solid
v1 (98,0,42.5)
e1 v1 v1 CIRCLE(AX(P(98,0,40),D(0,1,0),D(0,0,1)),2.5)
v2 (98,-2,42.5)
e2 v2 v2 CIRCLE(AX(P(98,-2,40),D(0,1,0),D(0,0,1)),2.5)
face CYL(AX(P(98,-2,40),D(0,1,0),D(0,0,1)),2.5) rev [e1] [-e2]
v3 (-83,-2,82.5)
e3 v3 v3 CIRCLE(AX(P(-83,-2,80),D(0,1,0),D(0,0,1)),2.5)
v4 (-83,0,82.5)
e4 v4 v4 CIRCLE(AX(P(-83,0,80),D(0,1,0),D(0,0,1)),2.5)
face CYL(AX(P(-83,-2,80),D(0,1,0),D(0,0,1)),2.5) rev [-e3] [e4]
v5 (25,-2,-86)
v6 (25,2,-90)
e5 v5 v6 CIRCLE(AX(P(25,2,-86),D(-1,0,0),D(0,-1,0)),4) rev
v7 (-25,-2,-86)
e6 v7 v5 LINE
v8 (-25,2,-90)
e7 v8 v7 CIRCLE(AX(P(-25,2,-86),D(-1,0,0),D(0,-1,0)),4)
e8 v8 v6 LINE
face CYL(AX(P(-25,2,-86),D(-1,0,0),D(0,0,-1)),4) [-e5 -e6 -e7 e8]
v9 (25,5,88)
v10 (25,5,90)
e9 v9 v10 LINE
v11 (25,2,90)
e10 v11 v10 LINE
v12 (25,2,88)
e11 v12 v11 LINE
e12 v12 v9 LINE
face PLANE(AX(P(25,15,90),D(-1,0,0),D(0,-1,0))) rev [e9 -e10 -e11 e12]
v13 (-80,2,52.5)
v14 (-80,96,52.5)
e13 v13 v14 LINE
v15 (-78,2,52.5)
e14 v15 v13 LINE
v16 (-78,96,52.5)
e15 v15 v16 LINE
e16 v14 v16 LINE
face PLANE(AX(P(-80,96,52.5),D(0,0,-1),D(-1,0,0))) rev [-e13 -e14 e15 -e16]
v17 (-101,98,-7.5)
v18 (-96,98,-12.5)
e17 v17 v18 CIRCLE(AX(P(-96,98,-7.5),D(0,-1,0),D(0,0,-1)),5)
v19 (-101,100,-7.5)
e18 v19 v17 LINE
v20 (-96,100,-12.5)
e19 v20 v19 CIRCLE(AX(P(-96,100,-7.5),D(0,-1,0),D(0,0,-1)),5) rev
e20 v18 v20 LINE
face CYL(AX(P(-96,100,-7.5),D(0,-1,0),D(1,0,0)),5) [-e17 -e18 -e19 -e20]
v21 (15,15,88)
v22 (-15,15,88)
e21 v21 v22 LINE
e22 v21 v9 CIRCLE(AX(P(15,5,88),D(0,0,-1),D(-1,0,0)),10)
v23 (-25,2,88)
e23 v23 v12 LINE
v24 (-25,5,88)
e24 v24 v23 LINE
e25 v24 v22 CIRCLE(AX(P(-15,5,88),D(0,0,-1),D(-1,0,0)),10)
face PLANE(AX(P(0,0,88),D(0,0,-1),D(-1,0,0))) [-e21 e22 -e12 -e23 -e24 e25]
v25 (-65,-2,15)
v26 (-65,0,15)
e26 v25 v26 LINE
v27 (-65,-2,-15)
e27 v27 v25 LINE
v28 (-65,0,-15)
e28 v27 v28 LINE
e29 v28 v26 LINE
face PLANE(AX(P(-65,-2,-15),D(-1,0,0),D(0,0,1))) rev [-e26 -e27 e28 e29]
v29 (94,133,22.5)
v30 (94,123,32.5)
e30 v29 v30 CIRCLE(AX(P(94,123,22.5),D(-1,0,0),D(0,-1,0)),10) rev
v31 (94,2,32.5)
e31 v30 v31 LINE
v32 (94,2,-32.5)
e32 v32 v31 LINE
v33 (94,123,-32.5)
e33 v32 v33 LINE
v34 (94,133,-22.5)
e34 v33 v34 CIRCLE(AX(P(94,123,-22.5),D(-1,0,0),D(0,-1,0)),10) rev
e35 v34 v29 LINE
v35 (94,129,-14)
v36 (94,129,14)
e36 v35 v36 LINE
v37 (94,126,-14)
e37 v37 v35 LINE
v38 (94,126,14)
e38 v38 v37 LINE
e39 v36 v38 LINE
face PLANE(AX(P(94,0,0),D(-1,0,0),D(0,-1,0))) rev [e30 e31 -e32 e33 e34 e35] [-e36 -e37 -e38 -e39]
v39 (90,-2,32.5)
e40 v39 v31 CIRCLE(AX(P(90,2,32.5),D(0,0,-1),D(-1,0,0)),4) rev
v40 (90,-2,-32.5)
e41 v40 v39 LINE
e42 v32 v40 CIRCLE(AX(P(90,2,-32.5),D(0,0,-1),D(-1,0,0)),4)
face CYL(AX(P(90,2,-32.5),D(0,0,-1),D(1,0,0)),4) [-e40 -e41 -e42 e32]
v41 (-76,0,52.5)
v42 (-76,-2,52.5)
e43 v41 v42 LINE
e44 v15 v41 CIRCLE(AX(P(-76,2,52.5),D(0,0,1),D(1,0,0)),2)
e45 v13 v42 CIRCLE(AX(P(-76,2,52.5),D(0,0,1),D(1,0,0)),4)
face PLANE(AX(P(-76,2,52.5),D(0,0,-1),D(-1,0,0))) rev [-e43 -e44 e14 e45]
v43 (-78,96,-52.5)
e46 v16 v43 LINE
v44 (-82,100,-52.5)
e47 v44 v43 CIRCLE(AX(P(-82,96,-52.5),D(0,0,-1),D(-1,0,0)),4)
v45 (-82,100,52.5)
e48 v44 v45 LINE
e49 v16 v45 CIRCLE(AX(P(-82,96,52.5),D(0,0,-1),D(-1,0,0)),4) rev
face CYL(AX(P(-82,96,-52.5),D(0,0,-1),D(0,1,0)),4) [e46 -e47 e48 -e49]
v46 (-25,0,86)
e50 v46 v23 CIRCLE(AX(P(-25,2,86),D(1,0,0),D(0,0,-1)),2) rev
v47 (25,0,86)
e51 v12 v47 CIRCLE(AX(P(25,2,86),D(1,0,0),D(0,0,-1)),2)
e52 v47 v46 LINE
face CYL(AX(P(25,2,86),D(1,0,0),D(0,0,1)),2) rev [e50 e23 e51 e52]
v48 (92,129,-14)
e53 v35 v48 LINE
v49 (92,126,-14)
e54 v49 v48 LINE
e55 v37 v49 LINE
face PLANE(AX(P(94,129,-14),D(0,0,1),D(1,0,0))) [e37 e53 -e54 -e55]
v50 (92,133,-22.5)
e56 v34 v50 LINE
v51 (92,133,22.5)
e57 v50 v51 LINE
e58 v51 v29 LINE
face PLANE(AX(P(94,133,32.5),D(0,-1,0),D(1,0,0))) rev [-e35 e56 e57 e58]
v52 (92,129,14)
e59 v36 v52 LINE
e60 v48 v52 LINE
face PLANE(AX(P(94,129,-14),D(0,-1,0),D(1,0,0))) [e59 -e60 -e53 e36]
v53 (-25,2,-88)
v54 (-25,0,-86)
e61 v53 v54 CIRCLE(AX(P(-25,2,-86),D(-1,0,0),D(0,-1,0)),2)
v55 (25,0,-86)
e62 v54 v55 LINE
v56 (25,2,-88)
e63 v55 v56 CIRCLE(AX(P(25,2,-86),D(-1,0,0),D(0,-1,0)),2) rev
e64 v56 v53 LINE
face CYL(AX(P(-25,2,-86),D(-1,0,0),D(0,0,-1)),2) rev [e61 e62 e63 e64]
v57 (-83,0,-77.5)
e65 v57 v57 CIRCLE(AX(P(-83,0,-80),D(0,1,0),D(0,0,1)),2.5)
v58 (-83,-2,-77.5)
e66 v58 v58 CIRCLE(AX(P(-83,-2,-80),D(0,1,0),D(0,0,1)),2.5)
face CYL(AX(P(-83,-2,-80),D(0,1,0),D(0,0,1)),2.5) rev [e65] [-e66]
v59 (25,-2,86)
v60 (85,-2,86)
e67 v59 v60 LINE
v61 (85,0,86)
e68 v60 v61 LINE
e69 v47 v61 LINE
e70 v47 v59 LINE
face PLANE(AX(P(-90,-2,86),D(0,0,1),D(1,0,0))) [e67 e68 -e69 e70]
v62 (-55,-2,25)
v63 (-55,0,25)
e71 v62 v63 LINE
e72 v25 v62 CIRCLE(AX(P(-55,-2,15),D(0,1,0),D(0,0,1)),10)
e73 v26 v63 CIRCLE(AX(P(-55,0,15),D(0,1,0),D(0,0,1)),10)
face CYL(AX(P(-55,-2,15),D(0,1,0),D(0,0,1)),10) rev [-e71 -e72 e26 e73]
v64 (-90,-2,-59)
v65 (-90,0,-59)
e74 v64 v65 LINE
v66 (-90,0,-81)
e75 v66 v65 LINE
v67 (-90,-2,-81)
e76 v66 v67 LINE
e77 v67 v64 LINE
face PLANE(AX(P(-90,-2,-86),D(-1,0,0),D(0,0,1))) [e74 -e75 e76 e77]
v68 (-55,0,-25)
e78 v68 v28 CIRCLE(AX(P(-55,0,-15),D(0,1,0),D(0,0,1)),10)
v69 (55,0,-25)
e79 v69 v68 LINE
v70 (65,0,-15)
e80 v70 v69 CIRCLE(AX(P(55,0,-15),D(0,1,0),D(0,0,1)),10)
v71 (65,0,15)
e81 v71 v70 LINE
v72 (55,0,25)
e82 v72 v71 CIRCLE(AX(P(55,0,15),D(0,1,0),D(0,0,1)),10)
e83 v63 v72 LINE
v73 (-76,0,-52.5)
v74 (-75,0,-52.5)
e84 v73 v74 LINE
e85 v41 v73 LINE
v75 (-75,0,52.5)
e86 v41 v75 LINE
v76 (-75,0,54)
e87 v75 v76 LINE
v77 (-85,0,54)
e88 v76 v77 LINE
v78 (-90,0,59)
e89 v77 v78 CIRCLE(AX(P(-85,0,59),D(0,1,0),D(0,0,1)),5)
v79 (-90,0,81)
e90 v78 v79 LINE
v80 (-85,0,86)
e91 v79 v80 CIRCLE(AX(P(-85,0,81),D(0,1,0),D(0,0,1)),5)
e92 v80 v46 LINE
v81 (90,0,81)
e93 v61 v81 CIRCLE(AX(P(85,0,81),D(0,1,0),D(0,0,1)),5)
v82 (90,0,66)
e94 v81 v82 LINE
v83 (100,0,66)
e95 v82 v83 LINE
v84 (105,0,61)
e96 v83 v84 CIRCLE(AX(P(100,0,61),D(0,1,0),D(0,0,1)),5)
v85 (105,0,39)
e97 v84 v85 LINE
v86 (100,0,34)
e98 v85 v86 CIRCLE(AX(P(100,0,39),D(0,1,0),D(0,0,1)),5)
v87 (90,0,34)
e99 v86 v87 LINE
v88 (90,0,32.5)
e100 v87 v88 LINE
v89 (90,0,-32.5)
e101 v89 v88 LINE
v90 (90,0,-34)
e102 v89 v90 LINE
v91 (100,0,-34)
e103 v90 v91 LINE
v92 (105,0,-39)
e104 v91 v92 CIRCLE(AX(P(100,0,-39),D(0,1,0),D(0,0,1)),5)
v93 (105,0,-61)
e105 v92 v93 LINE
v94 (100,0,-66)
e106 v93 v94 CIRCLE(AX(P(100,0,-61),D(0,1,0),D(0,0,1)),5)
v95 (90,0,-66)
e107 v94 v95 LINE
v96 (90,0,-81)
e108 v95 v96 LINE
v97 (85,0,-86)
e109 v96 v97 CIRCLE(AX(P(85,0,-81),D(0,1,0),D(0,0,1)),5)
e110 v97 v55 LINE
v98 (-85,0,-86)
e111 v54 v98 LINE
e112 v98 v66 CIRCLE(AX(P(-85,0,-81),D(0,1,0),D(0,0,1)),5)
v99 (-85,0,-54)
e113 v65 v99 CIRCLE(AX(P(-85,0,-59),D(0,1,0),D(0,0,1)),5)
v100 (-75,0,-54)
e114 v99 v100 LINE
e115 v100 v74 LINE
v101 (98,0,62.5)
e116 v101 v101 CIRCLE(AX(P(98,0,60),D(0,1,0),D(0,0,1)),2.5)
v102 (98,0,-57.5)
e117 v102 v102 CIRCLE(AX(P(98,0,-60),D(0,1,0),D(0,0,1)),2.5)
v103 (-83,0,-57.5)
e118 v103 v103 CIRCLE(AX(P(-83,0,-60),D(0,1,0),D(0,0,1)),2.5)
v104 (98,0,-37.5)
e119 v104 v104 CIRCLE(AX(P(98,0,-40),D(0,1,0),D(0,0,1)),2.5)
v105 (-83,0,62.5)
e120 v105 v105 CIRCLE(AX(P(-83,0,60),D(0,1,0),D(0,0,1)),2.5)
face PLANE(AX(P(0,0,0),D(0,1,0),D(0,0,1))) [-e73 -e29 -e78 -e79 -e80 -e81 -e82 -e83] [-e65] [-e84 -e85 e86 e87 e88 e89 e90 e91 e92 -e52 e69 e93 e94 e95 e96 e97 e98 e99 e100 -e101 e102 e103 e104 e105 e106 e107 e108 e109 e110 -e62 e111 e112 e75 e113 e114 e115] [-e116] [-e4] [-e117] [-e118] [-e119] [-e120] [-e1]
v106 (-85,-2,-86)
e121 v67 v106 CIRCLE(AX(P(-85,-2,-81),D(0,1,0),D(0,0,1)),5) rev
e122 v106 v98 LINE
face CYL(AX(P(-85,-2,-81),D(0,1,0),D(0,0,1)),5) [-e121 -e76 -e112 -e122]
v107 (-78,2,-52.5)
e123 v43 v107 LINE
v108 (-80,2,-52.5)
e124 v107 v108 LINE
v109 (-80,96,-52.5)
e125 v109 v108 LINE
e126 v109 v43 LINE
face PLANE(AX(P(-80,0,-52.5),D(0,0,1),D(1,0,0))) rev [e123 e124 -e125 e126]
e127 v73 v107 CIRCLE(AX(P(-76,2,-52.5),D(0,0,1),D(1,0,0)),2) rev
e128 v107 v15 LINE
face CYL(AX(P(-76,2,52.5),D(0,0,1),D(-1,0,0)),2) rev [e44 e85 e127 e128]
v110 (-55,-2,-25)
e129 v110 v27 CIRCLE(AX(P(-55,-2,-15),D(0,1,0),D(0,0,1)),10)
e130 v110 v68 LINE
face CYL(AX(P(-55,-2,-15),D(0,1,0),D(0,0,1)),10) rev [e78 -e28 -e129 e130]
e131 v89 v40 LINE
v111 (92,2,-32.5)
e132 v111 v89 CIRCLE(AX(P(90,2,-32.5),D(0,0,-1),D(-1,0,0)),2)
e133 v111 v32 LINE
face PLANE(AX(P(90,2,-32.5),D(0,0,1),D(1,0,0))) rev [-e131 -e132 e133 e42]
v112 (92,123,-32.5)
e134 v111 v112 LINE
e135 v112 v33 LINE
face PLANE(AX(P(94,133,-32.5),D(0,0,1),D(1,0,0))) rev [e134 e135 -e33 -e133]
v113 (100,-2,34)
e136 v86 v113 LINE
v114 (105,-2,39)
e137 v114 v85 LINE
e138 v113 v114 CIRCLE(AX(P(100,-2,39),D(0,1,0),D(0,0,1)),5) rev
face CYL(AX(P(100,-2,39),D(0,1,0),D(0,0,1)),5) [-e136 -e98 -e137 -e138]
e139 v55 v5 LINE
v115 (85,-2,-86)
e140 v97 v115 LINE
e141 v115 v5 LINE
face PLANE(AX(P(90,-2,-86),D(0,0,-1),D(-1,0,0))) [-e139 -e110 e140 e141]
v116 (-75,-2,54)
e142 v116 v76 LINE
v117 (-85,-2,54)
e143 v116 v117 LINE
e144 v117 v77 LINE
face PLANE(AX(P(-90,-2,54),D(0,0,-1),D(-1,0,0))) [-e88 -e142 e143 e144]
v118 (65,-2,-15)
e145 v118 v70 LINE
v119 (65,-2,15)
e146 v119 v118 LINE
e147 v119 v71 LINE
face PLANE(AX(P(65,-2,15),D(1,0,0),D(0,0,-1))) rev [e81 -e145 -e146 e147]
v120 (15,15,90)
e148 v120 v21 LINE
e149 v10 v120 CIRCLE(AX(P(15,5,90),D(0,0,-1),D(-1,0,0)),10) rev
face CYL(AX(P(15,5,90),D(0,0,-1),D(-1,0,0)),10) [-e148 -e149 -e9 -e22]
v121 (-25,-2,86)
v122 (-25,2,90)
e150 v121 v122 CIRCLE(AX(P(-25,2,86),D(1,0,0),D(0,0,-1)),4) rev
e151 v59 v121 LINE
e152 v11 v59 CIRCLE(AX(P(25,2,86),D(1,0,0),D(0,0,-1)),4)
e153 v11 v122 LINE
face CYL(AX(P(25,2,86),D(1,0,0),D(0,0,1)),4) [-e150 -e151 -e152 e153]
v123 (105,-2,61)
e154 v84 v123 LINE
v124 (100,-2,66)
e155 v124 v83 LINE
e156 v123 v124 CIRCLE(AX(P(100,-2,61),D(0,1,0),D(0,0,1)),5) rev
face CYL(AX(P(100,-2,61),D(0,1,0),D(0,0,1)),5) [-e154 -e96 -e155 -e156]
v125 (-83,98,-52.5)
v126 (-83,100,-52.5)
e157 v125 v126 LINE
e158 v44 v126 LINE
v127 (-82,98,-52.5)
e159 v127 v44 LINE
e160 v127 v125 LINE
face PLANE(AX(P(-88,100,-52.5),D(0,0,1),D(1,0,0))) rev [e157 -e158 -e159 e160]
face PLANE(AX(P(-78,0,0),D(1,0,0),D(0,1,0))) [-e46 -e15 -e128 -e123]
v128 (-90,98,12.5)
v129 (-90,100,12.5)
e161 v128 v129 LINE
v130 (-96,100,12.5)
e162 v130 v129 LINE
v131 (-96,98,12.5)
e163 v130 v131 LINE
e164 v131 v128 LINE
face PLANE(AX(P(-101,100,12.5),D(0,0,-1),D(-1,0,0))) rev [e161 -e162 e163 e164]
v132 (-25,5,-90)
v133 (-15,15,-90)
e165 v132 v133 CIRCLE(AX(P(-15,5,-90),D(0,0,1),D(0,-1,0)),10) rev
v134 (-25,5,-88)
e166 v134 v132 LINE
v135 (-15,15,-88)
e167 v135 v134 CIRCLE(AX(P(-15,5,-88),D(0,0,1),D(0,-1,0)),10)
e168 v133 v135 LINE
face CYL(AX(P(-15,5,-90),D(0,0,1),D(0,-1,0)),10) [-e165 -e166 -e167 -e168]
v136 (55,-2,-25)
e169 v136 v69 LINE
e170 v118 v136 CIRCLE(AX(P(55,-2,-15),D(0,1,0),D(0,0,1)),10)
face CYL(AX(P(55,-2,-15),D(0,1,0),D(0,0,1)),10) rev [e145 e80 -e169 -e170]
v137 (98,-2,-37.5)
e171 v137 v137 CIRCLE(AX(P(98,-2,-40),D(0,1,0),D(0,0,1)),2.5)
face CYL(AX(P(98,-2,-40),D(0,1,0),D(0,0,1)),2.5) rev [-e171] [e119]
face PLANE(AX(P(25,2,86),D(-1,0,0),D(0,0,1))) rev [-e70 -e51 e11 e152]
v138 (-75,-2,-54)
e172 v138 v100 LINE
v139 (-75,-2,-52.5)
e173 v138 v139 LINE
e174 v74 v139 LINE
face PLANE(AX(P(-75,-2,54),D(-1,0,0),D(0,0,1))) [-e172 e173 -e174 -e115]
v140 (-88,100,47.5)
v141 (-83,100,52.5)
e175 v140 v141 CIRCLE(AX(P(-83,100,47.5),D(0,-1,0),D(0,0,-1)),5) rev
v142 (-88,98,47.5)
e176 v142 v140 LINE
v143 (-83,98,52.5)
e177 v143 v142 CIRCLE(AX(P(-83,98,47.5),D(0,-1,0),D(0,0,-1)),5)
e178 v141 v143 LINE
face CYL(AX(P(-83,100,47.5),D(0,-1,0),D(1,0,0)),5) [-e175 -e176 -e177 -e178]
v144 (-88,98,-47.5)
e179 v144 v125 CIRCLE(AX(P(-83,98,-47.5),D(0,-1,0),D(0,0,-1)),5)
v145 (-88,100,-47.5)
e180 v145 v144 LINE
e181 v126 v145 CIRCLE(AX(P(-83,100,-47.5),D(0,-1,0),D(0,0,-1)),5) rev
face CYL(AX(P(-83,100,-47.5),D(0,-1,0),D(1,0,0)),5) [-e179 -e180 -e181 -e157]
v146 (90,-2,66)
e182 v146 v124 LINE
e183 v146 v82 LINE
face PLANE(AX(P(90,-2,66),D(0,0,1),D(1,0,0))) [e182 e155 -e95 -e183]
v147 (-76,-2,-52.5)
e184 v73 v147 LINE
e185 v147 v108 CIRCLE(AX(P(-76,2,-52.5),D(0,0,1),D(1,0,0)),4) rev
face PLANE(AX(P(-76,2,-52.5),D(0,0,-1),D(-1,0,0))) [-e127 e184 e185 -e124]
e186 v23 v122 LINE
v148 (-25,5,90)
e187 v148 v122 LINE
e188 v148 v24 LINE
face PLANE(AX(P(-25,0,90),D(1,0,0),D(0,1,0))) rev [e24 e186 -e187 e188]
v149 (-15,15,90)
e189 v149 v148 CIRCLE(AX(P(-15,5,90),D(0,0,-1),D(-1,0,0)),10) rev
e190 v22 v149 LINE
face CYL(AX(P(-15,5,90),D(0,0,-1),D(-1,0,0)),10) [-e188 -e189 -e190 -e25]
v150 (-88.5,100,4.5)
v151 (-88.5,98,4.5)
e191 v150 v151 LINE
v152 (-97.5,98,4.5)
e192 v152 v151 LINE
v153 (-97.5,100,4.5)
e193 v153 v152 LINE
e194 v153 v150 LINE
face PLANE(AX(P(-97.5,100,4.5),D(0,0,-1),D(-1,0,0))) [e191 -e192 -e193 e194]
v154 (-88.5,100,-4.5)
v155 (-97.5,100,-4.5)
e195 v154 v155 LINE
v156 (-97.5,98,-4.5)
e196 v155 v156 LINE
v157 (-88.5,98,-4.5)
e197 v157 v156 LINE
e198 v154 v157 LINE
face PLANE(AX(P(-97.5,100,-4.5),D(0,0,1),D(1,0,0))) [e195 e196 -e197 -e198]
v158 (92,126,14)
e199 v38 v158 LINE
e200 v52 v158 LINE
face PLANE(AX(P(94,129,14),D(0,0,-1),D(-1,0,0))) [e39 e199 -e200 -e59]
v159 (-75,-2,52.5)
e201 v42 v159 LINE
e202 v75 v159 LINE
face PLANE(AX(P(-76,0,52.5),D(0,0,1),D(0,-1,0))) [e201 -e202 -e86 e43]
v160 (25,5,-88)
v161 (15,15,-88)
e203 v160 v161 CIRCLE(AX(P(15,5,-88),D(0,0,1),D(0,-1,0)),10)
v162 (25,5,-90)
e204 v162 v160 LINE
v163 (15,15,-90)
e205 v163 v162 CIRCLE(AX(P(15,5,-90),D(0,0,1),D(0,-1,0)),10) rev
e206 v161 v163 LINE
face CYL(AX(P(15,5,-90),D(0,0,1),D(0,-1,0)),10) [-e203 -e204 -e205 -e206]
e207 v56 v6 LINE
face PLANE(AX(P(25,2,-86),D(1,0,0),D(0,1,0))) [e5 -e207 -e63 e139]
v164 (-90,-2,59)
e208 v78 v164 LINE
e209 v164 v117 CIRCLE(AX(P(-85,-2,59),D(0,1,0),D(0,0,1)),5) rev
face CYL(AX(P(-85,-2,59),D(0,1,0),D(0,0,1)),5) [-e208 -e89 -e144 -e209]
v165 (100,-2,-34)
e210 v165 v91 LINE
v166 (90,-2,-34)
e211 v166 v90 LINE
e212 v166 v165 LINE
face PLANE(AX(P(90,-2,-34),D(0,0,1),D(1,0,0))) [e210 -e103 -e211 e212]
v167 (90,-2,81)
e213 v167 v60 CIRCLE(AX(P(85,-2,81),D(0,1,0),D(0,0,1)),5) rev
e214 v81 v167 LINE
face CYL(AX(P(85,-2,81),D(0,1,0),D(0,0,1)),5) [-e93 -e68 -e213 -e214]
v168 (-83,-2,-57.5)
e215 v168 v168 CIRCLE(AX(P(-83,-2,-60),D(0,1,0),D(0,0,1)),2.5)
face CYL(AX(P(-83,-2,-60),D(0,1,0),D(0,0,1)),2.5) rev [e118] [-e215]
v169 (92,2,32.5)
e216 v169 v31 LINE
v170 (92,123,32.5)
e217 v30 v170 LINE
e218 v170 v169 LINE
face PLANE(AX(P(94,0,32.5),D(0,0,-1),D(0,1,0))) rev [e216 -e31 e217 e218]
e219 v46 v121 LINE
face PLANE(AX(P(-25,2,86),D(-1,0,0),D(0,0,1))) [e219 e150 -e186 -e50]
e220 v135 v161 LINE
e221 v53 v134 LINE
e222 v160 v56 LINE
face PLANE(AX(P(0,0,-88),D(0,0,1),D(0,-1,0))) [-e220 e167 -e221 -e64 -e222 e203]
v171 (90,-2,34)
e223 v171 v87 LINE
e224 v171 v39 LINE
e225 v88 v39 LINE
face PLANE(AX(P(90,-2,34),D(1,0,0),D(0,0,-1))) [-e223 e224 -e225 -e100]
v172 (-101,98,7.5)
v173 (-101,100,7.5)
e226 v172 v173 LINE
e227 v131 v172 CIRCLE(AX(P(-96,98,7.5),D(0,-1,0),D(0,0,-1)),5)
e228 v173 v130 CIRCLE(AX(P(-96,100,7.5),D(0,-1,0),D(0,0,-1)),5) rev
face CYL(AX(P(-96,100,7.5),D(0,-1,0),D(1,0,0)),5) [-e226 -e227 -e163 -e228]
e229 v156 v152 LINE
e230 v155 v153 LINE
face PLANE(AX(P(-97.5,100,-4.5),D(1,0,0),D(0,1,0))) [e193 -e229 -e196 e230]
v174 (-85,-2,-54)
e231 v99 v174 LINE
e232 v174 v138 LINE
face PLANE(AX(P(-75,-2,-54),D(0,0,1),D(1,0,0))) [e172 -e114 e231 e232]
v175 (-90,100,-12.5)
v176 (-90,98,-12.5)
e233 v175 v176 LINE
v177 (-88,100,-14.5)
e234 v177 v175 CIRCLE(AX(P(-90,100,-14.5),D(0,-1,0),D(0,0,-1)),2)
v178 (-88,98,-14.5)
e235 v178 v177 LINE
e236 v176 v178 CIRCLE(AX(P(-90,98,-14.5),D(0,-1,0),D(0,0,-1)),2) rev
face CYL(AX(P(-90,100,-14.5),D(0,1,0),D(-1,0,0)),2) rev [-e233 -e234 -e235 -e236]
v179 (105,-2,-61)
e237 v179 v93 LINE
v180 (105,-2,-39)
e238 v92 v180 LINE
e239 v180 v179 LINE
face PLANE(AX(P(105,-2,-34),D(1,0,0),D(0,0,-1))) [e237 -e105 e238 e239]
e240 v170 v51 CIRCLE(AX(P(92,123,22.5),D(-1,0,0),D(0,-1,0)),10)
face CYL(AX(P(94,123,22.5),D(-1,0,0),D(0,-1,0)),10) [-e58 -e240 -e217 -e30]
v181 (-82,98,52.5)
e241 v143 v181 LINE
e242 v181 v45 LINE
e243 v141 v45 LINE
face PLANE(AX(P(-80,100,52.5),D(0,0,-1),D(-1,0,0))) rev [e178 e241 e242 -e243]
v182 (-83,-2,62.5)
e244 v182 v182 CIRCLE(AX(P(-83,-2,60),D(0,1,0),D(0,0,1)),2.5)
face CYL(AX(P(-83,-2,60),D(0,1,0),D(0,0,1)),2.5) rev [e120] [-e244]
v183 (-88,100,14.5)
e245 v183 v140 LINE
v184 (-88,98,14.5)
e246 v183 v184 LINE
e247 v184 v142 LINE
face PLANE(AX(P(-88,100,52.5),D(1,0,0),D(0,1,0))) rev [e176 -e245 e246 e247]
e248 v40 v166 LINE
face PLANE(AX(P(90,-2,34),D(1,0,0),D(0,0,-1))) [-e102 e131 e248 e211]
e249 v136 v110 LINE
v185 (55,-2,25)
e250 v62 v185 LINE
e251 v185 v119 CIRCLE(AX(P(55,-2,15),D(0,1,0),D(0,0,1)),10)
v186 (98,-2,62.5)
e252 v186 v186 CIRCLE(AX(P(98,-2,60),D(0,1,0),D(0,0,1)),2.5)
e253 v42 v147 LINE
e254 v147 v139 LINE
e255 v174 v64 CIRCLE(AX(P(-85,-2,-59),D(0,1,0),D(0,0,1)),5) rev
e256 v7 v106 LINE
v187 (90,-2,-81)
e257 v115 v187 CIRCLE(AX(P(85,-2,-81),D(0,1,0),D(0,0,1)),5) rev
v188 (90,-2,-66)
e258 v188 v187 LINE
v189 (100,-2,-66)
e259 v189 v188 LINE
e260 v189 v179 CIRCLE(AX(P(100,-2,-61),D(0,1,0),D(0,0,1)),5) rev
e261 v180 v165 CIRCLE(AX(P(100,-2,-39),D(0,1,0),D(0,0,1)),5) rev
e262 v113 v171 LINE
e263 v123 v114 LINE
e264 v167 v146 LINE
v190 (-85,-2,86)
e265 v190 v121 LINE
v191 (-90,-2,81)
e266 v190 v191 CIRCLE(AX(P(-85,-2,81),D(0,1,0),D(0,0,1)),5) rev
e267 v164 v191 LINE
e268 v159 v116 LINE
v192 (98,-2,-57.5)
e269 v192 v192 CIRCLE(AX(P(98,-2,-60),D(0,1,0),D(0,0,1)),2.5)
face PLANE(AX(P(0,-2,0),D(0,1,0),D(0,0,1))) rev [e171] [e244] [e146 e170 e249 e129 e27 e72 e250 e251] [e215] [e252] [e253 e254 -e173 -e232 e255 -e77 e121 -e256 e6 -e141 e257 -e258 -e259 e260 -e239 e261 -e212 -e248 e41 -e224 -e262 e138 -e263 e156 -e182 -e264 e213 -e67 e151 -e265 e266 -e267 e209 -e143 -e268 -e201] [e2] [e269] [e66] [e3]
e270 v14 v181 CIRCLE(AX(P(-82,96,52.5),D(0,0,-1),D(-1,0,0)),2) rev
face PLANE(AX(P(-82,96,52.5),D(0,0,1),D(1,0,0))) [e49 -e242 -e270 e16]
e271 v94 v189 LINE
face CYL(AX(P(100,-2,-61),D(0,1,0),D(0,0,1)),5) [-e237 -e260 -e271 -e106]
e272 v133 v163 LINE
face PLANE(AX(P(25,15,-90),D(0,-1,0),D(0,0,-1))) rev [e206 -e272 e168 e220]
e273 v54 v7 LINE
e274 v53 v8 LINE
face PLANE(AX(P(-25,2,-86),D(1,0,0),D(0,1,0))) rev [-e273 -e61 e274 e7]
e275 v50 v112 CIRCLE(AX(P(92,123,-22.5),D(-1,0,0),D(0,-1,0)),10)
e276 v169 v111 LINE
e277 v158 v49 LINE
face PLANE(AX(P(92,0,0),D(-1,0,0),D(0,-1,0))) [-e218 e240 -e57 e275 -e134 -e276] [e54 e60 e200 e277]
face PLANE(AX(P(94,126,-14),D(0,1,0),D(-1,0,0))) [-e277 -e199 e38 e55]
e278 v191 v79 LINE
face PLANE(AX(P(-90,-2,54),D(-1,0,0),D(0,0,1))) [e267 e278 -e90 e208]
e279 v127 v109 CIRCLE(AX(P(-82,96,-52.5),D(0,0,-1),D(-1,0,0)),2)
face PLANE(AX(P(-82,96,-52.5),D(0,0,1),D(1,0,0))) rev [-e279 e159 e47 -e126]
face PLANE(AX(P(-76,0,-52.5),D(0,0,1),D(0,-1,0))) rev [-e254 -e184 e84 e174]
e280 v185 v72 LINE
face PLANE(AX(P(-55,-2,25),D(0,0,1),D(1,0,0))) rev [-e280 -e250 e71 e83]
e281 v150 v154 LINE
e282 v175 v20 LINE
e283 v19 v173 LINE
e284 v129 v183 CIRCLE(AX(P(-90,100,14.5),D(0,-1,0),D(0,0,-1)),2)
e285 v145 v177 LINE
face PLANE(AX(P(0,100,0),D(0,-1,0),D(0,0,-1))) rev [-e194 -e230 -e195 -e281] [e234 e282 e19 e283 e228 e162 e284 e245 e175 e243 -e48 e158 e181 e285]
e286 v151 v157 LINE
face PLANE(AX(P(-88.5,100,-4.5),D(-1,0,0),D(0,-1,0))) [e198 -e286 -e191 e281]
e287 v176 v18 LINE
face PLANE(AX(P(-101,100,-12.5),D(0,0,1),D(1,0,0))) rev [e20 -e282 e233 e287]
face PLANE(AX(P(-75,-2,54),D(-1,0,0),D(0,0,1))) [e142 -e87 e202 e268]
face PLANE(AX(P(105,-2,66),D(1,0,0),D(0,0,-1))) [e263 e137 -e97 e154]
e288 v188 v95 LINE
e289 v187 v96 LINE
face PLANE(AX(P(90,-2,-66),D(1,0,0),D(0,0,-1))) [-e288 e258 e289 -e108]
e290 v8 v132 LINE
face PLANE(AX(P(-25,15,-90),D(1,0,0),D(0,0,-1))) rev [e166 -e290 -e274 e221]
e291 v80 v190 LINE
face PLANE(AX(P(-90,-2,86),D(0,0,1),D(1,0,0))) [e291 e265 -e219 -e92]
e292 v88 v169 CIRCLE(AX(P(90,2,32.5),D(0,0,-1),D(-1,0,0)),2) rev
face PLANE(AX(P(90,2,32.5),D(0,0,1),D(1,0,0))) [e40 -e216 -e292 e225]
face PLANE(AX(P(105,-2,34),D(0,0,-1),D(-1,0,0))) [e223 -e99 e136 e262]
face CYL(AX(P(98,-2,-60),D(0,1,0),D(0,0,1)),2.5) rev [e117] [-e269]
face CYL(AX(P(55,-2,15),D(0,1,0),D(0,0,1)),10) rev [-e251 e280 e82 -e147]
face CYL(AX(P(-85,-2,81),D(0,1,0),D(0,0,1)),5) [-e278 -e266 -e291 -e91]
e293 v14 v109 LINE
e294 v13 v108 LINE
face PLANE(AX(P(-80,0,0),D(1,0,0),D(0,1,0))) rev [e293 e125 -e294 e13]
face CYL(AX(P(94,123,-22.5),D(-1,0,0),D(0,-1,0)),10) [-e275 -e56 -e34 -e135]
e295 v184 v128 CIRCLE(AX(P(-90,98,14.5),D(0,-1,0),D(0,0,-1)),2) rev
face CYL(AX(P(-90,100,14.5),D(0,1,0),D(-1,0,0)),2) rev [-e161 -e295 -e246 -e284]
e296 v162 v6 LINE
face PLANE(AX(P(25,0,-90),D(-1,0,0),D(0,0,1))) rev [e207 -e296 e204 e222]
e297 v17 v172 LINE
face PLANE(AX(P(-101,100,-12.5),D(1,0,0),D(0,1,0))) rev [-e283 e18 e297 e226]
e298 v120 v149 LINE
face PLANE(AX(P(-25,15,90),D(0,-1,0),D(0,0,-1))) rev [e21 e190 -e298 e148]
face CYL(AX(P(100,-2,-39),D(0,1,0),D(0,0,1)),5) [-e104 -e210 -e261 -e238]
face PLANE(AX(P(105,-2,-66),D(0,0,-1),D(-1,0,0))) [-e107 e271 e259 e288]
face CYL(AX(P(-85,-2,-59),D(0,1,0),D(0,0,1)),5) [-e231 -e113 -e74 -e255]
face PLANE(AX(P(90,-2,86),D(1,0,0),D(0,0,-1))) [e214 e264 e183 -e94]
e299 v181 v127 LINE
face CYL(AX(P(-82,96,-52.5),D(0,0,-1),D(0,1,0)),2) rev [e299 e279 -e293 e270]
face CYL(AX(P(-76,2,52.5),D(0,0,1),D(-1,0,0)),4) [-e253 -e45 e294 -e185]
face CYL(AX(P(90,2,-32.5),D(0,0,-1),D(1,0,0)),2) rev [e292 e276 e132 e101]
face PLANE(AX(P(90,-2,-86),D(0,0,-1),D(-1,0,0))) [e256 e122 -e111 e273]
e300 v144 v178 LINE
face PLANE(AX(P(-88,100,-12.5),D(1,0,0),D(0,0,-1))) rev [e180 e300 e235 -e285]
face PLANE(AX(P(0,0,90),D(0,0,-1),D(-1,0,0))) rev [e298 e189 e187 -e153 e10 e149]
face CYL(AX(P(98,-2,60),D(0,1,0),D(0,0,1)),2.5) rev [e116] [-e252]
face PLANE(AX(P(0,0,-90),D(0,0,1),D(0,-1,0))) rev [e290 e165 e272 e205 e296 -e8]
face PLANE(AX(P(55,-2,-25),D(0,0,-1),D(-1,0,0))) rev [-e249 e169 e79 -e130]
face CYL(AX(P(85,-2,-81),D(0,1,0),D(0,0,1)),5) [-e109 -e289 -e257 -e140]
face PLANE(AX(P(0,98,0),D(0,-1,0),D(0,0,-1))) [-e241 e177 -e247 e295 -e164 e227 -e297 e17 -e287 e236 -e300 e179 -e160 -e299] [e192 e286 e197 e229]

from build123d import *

# Parameters (mm, degrees)
SKETCH_2_R                   = 2.5
SM_BASE_FLANGE_1_DEPTH       = 2
FILLET_1_R                   = 5
SM_EDGE_FLANGE_1_DEPTH       = 105
SM_EDGE_FLANGE_2_DEPTH       = 65
SM_START                     = 2
SM_EDGE_FLANGE_2_PROFILE_W   = 65
SM_EDGE_FLANGE_2_PROFILE_H   = 131
SM_EDGE_FLANGE_2_PROFILE_W_2 = 28
SM_EDGE_FLANGE_2_PROFILE_H_2 = 3
SM_EDGE_FLANGE_2_FLAT_DEPTH  = 2
SM_EDGE_FLANGE_3_DEPTH       = 105
SM_EDGE_FLANGE_3_PROFILE_W   = 9
SM_EDGE_FLANGE_3_PROFILE_H   = 9
SM_EDGE_FLANGE_3_FLAT_DEPTH  = 2
FILLET_3_R                   = 5
FILLET_4_R                   = 2
SM_EDGE_FLANGE_4_DEPTH       = 50
SM_EDGE_FLANGE_4_BEND_DEPTH  = 50
FILLET_2_R                   = 10


# Sheet-metal steps are written as plain solids
with BuildPart() as part:
    # Sketch 2 → Базовая кромка1 (new body)
    with BuildSketch(Plane(origin=(0, 0, 0), x_dir=(1, 0, 0), z_dir=(0, 1, 0))):
        Polygon((-90, -54), (-90, -86), (90, -86), (90, -66), (105, -66), (105, -34), (90, -34), (90, 34), (105, 34), (105, 66), (90, 66), (90, 86), (-90, 86), (-90, 54), (-75, 54), (-75, -54), align=None)
        with Locations(Location((-83, 80, 0), (0, 0, 270))):
            Circle(SKETCH_2_R, mode=Mode.SUBTRACT)
        with Locations(Location((-83, 60, 0), (0, 0, 270))):
            Circle(SKETCH_2_R, mode=Mode.SUBTRACT)
        with Locations(Location((98, 60, 0), (0, 0, 270))):
            Circle(SKETCH_2_R, mode=Mode.SUBTRACT)
        with Locations(Location((98, 40, 0), (0, 0, 270))):
            Circle(SKETCH_2_R, mode=Mode.SUBTRACT)
        with Locations(Location((98, -40, 0), (0, 0, 270))):
            Circle(SKETCH_2_R, mode=Mode.SUBTRACT)
        with Locations(Location((98, -60, 0), (0, 0, 270))):
            Circle(SKETCH_2_R, mode=Mode.SUBTRACT)
        with Locations(Location((-83, -60, 0), (0, 0, 270))):
            Circle(SKETCH_2_R, mode=Mode.SUBTRACT)
        with Locations(Location((-83, -80, 0), (0, 0, 270))):
            Circle(SKETCH_2_R, mode=Mode.SUBTRACT)
        with BuildLine():
            Line((-65, 15), (-65, -15))
            ThreePointArc((-65, -15), (-62.071067812, -22.071067812), (-55, -25))
            Line((-55, -25), (55, -25))
            ThreePointArc((55, -25), (62.071067812, -22.071067812), (65, -15))
            Line((65, -15), (65, 15))
            ThreePointArc((65, 15), (62.071067812, 22.071067812), (55, 25))
            Line((55, 25), (-55, 25))
            ThreePointArc((-55, 25), (-62.071067812, 22.071067812), (-65, 15))
        make_face(mode=Mode.SUBTRACT)
    extrude(amount=-SM_BASE_FLANGE_1_DEPTH)

    # Скругление1
    fillet_1_edges = [part.edges().sort_by_distance(p)[0] for p in [
        (105, -1, 66),
        (90, -1, 86),
        (-90, -1, 86),
        (-90, -1, 54),
        (-90, -1, -54),
        (-90, -1, -86),
        (90, -1, -86),
        (105, -1, -66),
        (105, -1, -34),
        (105, -1, 34),
    ]]
    fillet(fillet_1_edges, radius=FILLET_1_R)

    # Ребро-кромка1 section (across the edge) → Ребро-кромка1 (add)
    with BuildSketch(Plane(origin=(-78, 0, -52.5), x_dir=(1, 0, 0), z_dir=(0, 0, 1))):
        with BuildLine():
            Line((-2, 2), (-2, 96))
            Line((-2, 96), (0, 96))
            Line((0, 96), (0, 2))
            ThreePointArc((0, 2), (0.585786438, 0.585786438), (2, 0))
            Line((2, 0), (3, 0))
            Line((3, 0), (3, -2))
            Line((3, -2), (2, -2))
            ThreePointArc((2, -2), (-0.828427125, -0.828427125), (-2, 2))
        make_face()
    extrude(amount=SM_EDGE_FLANGE_1_DEPTH)

    # Ребро-кромка2 bend section (across the edge) → Ребро-кромка2 (add)
    with BuildSketch(Plane(origin=(92, 0, 32.5), x_dir=(-1, 0, 0), z_dir=(0, 0, -1))):
        with BuildLine():
            Line((-2, 2), (0, 2))
            ThreePointArc((0, 2), (0.585786438, 0.585786438), (2, 0))
            Line((2, 0), (2, -2))
            ThreePointArc((2, -2), (-0.828427125, -0.828427125), (-2, 2))
        make_face()
    extrude(amount=SM_EDGE_FLANGE_2_DEPTH)

    # Ребро-кромка2 profile (on flange) → Ребро-кромка2 flat (add)
    with BuildSketch(Plane(origin=(92, 0, 0), x_dir=(0, 0, -1), z_dir=(1, 0, 0)).offset(SM_START)):
        with Locations((0, 67.5)):
            Rectangle(SM_EDGE_FLANGE_2_PROFILE_W, SM_EDGE_FLANGE_2_PROFILE_H)
        with Locations((0, 127.5)):
            Rectangle(SM_EDGE_FLANGE_2_PROFILE_W_2, SM_EDGE_FLANGE_2_PROFILE_H_2, mode=Mode.SUBTRACT)
    extrude(amount=-SM_EDGE_FLANGE_2_FLAT_DEPTH)

    # Ребро-кромка3 bend section (across the edge) → Ребро-кромка3 (add)
    with BuildSketch(Plane(origin=(-80, 98, 52.5), x_dir=(0, -1, 0), z_dir=(0, 0, -1))):
        with BuildLine():
            Line((-2, 2), (0, 2))
            ThreePointArc((0, 2), (0.585786438, 0.585786438), (2, 0))
            Line((2, 0), (2, -2))
            ThreePointArc((2, -2), (-0.828427125, -0.828427125), (-2, 2))
        make_face()
    extrude(amount=SM_EDGE_FLANGE_3_DEPTH)

    # Ребро-кромка3 profile (on flange) → Ребро-кромка3 flat (add)
    with BuildSketch(Plane(origin=(-80, 98, 0), x_dir=(0, 0, -1), z_dir=(0, 1, 0)).offset(SM_START)):
        Polygon((-52.5, 8), (-52.5, 2), (52.5, 2), (52.5, 8), (12.5, 8), (12.5, 21), (-12.5, 21), (-12.5, 8), align=None)
        with Locations((0, 13)):
            Rectangle(SM_EDGE_FLANGE_3_PROFILE_W, SM_EDGE_FLANGE_3_PROFILE_H, mode=Mode.SUBTRACT)
    extrude(amount=-SM_EDGE_FLANGE_3_FLAT_DEPTH)

    # Скругление3
    fillet_3_edges = [part.edges().sort_by_distance(p)[0] for p in [
        (-88, 99, 52.5),
        (-88, 99, -52.5),
        (-101, 99, -12.5),
        (-101, 99, 12.5),
    ]]
    fillet(fillet_3_edges, radius=FILLET_3_R)

    # Скругление4
    fillet_4_edges = [part.edges().sort_by_distance(p)[0] for p in [
        (-88, 99, -12.5),
        (-88, 99, 12.5),
    ]]
    fillet(fillet_4_edges, radius=FILLET_4_R)

    # Ребро-кромка4 section (across the edge) → Ребро-кромка4 (add)
    with BuildSketch(Plane(origin=(-25, 0, 88), x_dir=(0, 0, -1), z_dir=(1, 0, 0))):
        with BuildLine():
            Line((-2, 2), (-2, 15))
            Line((-2, 15), (0, 15))
            Line((0, 15), (0, 2))
            ThreePointArc((0, 2), (0.585786438, 0.585786438), (2, 0))
            Line((2, 0), (2, -2))
            ThreePointArc((2, -2), (-0.828427125, -0.828427125), (-2, 2))
        make_face()
    extrude(amount=SM_EDGE_FLANGE_4_DEPTH)

    # Ребро-кромка4 section 2 (across the edge) → Ребро-кромка4 bend (add)
    with BuildSketch(Plane(origin=(25, 0, -88), x_dir=(0, 0, 1), z_dir=(-1, 0, 0))):
        with BuildLine():
            Line((-2, 2), (-2, 15))
            Line((-2, 15), (0, 15))
            Line((0, 15), (0, 2))
            ThreePointArc((0, 2), (0.585786438, 0.585786438), (2, 0))
            Line((2, 0), (2, -2))
            ThreePointArc((2, -2), (-0.828427125, -0.828427125), (-2, 2))
        make_face()
    extrude(amount=SM_EDGE_FLANGE_4_BEND_DEPTH)

    # Скругление2
    fillet_2_edges = [part.edges().sort_by_distance(p)[0] for p in [
        (93, 133, 32.5),
        (93, 133, -32.5),
        (-25, 15, 89),
        (25, 15, 89),
        (25, 15, -89),
        (-25, 15, -89),
    ]]
    fillet(fillet_2_edges, radius=FILLET_2_R)


solid = part.part
